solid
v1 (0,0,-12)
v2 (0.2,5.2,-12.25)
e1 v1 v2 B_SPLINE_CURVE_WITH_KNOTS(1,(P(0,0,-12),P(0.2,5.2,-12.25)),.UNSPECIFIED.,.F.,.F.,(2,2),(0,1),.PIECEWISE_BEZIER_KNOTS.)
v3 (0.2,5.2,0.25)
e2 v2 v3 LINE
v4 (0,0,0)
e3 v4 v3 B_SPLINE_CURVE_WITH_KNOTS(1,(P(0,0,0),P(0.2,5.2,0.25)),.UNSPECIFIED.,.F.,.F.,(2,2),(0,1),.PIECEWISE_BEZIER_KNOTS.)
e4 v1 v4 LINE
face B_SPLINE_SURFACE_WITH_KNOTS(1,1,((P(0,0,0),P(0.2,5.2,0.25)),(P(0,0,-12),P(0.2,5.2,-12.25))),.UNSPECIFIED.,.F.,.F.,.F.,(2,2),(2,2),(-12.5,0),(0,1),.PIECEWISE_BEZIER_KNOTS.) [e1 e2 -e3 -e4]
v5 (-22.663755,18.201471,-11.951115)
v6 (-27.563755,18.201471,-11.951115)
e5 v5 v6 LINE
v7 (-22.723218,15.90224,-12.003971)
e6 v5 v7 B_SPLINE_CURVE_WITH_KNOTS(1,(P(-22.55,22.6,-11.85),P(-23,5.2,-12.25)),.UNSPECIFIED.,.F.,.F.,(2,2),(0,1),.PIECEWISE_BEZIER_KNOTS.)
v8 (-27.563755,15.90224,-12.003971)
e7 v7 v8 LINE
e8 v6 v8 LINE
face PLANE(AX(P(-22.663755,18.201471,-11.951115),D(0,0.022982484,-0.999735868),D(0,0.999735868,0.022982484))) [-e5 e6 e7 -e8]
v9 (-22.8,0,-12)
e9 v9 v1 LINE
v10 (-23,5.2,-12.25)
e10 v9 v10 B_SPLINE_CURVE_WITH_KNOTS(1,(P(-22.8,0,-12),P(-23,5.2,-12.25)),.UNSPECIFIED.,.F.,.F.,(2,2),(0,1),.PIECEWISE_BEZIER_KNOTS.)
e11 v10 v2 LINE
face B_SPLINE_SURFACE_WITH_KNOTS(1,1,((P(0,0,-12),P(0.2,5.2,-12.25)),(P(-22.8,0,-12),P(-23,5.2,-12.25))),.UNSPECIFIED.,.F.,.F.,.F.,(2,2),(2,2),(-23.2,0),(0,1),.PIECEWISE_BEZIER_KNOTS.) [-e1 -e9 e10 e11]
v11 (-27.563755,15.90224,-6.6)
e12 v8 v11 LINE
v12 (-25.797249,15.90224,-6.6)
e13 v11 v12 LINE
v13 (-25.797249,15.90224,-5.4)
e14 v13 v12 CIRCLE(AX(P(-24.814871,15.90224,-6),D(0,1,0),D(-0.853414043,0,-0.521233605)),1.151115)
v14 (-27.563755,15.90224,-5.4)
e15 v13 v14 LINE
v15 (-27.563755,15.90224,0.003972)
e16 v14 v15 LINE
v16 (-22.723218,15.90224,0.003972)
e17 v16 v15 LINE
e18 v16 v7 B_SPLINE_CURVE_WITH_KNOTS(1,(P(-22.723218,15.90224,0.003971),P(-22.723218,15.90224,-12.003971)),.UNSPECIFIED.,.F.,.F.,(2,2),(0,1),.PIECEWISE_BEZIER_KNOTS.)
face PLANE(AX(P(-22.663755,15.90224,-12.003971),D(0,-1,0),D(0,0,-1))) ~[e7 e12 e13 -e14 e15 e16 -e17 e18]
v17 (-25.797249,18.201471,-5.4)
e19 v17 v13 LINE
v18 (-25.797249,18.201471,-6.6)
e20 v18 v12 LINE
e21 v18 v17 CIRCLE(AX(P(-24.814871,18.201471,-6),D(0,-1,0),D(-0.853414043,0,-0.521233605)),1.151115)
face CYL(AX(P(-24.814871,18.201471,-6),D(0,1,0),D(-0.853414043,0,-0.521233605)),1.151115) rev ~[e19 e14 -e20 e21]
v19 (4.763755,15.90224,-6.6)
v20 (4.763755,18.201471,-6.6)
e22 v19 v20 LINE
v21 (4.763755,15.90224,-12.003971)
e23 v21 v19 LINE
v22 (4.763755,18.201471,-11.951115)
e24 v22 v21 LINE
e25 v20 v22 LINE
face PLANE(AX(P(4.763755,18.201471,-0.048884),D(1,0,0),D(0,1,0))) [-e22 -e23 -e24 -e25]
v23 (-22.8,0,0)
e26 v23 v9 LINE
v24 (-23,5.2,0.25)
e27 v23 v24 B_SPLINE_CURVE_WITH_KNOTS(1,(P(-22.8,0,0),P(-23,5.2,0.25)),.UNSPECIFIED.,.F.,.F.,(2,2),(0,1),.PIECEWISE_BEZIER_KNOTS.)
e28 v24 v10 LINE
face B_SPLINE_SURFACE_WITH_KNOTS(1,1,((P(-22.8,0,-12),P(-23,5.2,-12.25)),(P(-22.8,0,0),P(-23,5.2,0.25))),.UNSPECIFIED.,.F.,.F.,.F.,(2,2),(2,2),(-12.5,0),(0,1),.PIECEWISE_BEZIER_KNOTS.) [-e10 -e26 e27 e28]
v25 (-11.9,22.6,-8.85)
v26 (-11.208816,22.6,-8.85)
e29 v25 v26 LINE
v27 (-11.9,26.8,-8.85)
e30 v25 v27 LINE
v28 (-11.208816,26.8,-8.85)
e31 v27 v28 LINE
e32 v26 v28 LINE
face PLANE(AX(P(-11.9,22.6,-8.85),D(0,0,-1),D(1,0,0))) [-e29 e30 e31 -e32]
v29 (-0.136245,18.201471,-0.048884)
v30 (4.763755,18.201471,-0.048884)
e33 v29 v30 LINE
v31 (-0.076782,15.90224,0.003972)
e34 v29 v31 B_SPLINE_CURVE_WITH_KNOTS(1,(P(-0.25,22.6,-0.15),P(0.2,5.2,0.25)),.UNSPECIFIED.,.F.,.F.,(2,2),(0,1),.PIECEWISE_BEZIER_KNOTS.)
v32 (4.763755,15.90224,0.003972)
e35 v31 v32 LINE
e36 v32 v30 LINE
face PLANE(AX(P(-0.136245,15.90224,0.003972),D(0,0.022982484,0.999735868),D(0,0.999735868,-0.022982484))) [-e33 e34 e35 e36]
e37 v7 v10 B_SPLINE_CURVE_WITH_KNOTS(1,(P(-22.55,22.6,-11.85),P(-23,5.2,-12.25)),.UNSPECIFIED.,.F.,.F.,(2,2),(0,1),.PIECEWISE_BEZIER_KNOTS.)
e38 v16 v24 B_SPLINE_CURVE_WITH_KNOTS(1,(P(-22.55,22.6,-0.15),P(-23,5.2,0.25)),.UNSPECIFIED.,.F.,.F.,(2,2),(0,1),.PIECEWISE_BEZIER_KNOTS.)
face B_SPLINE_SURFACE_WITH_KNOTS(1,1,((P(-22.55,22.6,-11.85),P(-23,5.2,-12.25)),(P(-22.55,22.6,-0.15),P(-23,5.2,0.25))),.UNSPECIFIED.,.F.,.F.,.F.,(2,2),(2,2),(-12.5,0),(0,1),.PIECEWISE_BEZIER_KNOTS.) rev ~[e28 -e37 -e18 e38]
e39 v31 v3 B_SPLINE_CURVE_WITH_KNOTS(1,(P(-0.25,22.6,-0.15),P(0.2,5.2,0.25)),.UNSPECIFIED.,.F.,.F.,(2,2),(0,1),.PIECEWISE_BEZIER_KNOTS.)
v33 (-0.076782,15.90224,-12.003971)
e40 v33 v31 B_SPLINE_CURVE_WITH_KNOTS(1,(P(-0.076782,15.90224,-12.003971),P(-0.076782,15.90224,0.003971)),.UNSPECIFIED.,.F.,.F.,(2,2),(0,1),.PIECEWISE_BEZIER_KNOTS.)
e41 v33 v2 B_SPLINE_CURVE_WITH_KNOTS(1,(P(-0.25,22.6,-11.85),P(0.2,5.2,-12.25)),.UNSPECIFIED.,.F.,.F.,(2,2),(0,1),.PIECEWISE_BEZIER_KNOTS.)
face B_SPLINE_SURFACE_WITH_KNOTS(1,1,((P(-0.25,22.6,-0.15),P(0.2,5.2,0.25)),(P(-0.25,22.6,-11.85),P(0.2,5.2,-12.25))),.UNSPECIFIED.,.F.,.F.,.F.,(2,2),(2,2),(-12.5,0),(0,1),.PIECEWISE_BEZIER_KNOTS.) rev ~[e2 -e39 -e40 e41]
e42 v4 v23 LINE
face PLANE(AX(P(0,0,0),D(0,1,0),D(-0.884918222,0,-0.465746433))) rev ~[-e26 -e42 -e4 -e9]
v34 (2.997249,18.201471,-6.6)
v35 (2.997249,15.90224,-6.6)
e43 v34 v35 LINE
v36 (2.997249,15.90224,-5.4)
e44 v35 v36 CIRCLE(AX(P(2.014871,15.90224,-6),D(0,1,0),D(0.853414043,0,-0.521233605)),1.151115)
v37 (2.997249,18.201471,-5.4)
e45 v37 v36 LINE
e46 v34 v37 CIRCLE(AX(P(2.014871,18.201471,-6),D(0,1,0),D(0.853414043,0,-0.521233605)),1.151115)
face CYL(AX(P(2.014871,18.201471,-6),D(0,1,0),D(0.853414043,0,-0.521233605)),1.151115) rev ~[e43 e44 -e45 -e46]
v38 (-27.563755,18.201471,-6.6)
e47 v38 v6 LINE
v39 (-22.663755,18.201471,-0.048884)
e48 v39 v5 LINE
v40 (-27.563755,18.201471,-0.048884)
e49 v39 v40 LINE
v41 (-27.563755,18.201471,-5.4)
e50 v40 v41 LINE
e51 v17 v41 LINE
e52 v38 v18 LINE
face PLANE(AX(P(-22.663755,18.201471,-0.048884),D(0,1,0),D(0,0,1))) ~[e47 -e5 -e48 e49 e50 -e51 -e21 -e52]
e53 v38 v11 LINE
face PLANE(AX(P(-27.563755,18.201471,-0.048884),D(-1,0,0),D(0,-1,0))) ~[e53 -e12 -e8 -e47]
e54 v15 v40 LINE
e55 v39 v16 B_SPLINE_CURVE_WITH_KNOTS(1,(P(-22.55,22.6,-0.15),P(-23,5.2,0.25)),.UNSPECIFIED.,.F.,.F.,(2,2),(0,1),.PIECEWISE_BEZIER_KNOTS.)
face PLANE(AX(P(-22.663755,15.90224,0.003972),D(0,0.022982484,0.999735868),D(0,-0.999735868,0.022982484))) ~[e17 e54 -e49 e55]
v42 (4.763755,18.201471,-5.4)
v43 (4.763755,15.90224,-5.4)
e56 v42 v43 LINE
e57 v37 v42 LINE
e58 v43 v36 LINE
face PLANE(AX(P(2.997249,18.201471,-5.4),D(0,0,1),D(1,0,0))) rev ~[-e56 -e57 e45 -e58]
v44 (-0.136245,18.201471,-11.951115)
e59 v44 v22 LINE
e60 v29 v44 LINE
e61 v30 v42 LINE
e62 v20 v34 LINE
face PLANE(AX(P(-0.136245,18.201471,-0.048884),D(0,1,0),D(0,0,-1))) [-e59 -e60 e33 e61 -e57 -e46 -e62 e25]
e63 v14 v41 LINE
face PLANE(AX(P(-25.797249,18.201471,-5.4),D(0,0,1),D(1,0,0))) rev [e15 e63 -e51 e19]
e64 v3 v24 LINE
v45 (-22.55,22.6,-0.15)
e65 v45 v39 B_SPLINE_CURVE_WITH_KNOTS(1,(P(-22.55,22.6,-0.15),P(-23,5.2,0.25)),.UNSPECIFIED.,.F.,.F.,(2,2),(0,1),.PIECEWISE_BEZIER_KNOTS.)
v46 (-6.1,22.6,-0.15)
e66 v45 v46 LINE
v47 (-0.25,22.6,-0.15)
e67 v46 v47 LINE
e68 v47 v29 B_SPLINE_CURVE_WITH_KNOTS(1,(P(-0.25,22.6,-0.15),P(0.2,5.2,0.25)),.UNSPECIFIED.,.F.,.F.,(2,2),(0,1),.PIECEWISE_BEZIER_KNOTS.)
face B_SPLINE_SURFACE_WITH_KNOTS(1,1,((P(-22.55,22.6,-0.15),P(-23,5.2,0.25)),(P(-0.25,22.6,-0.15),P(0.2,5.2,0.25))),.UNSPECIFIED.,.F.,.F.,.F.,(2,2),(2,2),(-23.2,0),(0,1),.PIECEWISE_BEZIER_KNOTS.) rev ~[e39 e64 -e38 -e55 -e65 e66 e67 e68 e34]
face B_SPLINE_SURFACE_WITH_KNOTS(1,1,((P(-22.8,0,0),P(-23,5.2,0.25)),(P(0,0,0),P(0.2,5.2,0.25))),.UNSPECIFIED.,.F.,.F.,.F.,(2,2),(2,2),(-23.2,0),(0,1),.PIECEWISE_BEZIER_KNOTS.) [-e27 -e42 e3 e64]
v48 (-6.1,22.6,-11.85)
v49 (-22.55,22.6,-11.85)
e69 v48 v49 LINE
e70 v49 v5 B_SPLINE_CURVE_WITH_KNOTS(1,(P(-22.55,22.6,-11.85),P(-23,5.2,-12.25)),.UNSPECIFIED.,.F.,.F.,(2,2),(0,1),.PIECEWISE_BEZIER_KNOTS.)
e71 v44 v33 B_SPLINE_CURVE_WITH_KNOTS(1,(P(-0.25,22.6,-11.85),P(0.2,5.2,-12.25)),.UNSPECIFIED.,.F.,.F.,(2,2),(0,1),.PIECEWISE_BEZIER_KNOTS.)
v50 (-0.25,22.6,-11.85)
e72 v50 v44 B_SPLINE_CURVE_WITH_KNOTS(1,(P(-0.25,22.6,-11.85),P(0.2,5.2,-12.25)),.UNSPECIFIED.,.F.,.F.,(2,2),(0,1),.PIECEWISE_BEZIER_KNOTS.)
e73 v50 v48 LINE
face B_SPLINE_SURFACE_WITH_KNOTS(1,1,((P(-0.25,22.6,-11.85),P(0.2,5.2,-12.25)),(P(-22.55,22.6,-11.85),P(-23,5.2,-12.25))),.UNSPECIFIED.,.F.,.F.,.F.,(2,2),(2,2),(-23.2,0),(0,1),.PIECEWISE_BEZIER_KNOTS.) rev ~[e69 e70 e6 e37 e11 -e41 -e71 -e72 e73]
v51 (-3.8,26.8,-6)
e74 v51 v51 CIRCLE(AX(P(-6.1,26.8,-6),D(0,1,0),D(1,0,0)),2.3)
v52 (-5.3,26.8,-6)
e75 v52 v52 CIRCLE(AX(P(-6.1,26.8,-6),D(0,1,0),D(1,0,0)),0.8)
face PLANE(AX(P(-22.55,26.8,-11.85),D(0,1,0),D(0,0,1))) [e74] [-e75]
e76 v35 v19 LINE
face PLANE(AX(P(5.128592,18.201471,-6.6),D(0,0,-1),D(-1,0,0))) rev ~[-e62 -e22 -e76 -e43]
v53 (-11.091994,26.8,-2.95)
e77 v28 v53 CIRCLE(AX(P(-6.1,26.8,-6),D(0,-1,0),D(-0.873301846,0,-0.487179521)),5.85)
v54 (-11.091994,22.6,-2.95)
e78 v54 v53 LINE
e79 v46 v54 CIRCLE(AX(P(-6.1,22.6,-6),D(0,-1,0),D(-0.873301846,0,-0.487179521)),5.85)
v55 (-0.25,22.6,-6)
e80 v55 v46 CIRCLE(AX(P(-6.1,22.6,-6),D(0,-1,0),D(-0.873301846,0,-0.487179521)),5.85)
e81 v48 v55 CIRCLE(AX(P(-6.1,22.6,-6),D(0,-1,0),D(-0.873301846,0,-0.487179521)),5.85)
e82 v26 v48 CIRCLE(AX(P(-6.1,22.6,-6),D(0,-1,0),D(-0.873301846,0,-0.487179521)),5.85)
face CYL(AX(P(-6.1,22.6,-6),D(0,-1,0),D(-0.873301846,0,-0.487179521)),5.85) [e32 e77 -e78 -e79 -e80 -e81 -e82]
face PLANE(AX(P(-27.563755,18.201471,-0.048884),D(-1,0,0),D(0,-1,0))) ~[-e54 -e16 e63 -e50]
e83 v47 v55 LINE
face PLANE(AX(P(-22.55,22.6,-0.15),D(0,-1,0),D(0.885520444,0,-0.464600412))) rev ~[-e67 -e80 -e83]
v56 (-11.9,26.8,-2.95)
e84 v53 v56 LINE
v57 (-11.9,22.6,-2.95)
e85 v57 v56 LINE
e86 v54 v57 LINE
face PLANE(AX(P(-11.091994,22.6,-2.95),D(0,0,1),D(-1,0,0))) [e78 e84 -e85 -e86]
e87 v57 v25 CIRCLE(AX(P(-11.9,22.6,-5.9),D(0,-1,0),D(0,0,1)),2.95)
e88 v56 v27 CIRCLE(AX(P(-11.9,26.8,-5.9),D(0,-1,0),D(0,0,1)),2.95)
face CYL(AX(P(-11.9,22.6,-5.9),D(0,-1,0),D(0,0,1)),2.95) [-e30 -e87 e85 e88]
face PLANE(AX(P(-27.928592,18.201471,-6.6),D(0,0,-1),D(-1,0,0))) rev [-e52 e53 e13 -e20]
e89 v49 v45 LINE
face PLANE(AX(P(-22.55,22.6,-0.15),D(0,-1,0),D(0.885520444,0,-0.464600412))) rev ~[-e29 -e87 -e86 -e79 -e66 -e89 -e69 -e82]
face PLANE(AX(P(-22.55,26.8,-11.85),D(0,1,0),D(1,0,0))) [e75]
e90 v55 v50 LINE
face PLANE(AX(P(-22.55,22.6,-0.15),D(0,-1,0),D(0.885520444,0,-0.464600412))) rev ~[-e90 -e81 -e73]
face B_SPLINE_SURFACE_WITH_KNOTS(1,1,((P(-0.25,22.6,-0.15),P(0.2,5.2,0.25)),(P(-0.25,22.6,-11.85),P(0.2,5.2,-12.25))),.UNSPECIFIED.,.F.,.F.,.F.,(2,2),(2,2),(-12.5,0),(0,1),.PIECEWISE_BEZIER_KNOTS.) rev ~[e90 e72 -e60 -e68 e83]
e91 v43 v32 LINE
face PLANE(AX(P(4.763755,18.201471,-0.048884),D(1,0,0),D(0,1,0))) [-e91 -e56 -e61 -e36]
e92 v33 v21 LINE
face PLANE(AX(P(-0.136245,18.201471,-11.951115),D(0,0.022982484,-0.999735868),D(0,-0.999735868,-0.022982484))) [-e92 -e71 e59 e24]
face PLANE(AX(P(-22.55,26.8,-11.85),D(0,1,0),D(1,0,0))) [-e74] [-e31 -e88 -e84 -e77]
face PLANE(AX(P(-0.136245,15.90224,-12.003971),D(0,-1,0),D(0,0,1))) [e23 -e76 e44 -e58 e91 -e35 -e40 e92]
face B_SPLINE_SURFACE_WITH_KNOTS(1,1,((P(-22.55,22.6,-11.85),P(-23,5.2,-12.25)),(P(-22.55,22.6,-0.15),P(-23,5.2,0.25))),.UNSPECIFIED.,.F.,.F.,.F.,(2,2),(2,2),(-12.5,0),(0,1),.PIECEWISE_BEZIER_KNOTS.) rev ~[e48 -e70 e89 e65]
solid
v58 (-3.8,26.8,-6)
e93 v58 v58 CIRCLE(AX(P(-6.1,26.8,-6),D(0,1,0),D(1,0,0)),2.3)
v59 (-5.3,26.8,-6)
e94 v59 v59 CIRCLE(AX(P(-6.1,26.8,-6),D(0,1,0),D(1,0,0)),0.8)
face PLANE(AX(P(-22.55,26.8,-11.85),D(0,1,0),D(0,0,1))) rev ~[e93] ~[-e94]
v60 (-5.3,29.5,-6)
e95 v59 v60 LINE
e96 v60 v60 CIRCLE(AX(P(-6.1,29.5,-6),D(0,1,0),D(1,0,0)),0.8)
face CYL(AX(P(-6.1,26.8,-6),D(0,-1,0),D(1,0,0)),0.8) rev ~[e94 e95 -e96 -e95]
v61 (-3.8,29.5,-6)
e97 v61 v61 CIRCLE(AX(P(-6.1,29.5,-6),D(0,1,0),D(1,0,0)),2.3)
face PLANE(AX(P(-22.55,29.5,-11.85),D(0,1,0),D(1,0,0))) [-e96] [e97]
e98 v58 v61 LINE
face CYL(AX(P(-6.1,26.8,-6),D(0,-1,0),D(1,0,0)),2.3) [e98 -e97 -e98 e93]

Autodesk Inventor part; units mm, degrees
sketch "Sketch1" plane through (0, 0, 0) normal (0, 1, 0) x (-1, 0, 0)
  line L0 (0, 0) -> (22.8, 0)
  line L1 (22.8, 0) -> (22.8, -12)
  line L2 (22.8, -12) -> (0, -12)
  line L3 (0, -12) -> (0, 0)
  dimension "d0" = 22.8
  dimension "d1" = 12
ref_plane "Work Plane3" through (0, 5.2, 0) normal (0, 1, 0) x (-1, 0, 0)
sketch "Sketch5" plane through (0, 5.2, 0) normal (0, 1, 0) x (-1, 0, 0)
  line L0 (11.4, -12.25) -> (23, -12.25)
  line L1 (23, -12.25) -> (-0.2, -12.25)
  line L2 (-0.2, -12.25) -> (-0.2, 0.25)
  line L3 (-0.2, 0.25) -> (23, 0.25)
  line L4 (23, 0.25) -> (23, -12.25)
  dimension "d32" = 23.2
  dimension "d33" = 12.5
sketch "Sketch1 outline for Loft1" plane through (0, 0, 0) normal (0, 1, 0) x (-1, 0, 0)
  line L0 (0, 0) -> (22.8, 0)
  line L1 (22.8, 0) -> (22.8, -12)
  line L2 (22.8, -12) -> (0, -12)
  line L3 (0, -12) -> (0, 0)
sketch "Sketch5 outline for Loft1" plane through (0, 5.2, 0) normal (0, 1, 0) x (-1, 0, 0)
  line L0 (23, -12.25) -> (-0.2, -12.25)
  line L1 (-0.2, -12.25) -> (-0.2, 0.25)
  line L2 (-0.2, 0.25) -> (23, 0.25)
  line L3 (23, 0.25) -> (23, -12.25)
loft "Loft1" add profiles "Sketch1 outline for Loft1", "Sketch5 outline for Loft1"
ref_plane "Work Plane4" through (0, 22.6, 0) normal (0, 1, 0) x (-1, 0, 0)
sketch "Sketch7" plane through (0, 22.6, 0) normal (0, 1, 0) x (-1, 0, 0)
  line L0 (0.25, -6) -> (0.25, -0.15)
  line L1 (0.25, -0.15) -> (0.25, -11.85)
  line L2 (0.25, -11.85) -> (22.55, -11.85)
  line L3 (0.25, -11.85) -> (22.55, -11.85)
  line L4 (22.55, -11.85) -> (22.55, -0.15)
  line L5 (22.55, -0.15) -> (0.25, -0.15)
  line L6 (0.25, -0.15) -> (0.25, -11.85)
  point P0 (0, 0)
sketch "Sketch7 outline for Loft2" plane through (0, 22.6, 0) normal (0, 1, 0) x (-1, 0, 0)
  line L0 (0.25, -0.15) -> (0.25, -11.85)
  line L1 (22.55, -0.15) -> (0.25, -0.15)
  line L2 (22.55, -11.85) -> (22.55, -0.15)
  line L3 (0.25, -11.85) -> (22.55, -11.85)
loft "Loft2" add profiles "Sketch7 outline for Loft2" section 2 edges at (-11.4, 5.2, 0.25) (0.2, 5.2, -6) (-11.4, 5.2, -12.25) (-23, 5.2, -6)
ref_plane "Work Plane5" through (-11.4, 0, 0) normal (1, 0, 0) x (0, 1, 0)
ref_plane "Work Plane7" through (-0.136245, 18.201471, -0.048884) normal (1, 0, 0) x (0, 1, 0)
ref_plane "Work Plane8" through (-0.136245, 18.201471, -0.048884) normal (-0.0258534, 0.9996657, 0) x (0.9996657, 0.0258534, 0)
sketch "Sketch10" plane through (-0.136245, 18.201471, -0.048884) normal (1, 0, 0) x (0, 1, 0)
  line L0 (0, 0) -> (0, -11.902231)
  line L1 (-2.299231, -11.955087) -> (-2.299231, 0.052856)
  line L2 (4.398529, -0.101116) -> (-13.001471, 0.298884)
  line L3 (4.398529, -11.801116) -> (-13.001471, -12.201116)
  point P0 (-18.201471, 0.048884)
sketch "Sketch10 outline for Extrusion6" plane through (-0.136245, 18.201471, -0.048884) normal (1, 0, 0) x (0, 1, 0)
  line L0 (0, 0) -> (0, -11.902231)
  line L1 (0, -11.902231) -> (-2.299231, -11.955087)
  line L2 (-2.299231, -11.955087) -> (-2.299231, 0.052856)
  line L3 (-2.299231, 0.052856) -> (0, 0)
extrude "Extrusion6" add sketch "Sketch10 outline for Extrusion6" along normal blind 4.9
sketch "Sketch9" plane through (-0.136245, 18.201471, -0.048884) normal (0, 1, 0) x (1, 0, 0)
  arc A0 (3.133494, 6.551116) -> (3.133494, 5.351116) centre (2.151116, 5.951116) ccw
  line L0 (0, 11.902231) -> (4.5, 11.902231)
  line L1 (0, 0) -> (4.5, 0)
  line L2 (0, 0) -> (0, 11.902231)
  line L3 (4.5, 11.902231) -> (4.5, 0)
  line L4 (4.5, 5.951116) -> (4.5, 6.551116)
  line L5 (4.5, 6.551116) -> (3.133494, 6.551116)
  line L6 (3.133494, 6.551116) -> (5.264837, 6.551116)
  line L7 (5.264837, 6.551116) -> (5.264837, 5.351116)
  line L8 (5.264837, 5.351116) -> (3.133494, 5.351116)
  point P0 (-0.334371, -0.048884)
  dimension "d58" = 4.8
  dimension "d59" = 4.8
  dimension "d60" = 1
  dimension "d62" = 1.2
sketch "Sketch9 outline for Extrusion5" plane through (-0.136245, 18.201471, -0.048884) normal (0, 1, 0) x (1, 0, 0)
  line L0 (5.264837, 6.551116) -> (3.133494, 6.551116)
  line L1 (5.264837, 5.351116) -> (5.264837, 6.551116)
  line L2 (3.133494, 5.351116) -> (5.264837, 5.351116)
  arc A0 (3.133494, 6.551116) -> (3.133494, 5.351116) centre (2.151116, 5.951116) ccw
extrude "Extrusion5" cut sketch "Sketch9 outline for Extrusion5" against normal blind 4.5
mirror "Mirror3" about plane through (-11.4, 0, 0) normal (1, 0, 0) of "Extrusion6", "Extrusion5"
sketch "Sketch11" plane through (-22.55, 22.6, -11.85) normal (0, 1, 0) x (1, 0, 0)
  arc A0 (11.458006, -8.9) -> (11.341184, -3) centre (16.45, -5.85) ccw
  line L0 (22.3, 0) -> (0, 0)
  line L1 (0, -11.7) -> (22.3, -11.7)
  line L2 (22.3, -11.7) -> (22.3, 0)
  arc A1 (10.65, -3) -> (10.65, -8.9) centre (10.65, -5.95) ccw
  line L3 (10.65, -3) -> (11.341184, -3)
  line L4 (10.65, -8.9) -> (11.458006, -8.9)
  point P0 (22.55, -11.85)
  dimension "d68" = 0
  dimension "d69" = 0
  dimension "d70" = 0
  dimension "d71" = 3
  dimension "d72" = 2.8
  dimension "d73" = 14.6
  dimension "d74" = 5.9
sketch "Sketch11 outline for Extrusion7" plane through (-22.55, 22.6, -11.85) normal (0, 1, 0) x (1, 0, 0)
  arc A0 (11.341184, -3) -> (11.458006, -8.9) centre (16.45, -5.85) cw
  line L0 (11.458006, -8.9) -> (10.65, -8.9)
  arc A1 (10.65, -8.9) -> (10.65, -3) centre (10.65, -5.95) cw
  line L1 (10.65, -3) -> (11.341184, -3)
extrude "Extrusion7" add sketch "Sketch11 outline for Extrusion7" along normal blind 4.2
sketch "Sketch12" plane through (-22.55, 26.8, -11.85) normal (0, 1, 0) x (1, 0, 0)
  arc A0 (11.458006, -8.9) -> (11.341184, -3) centre (16.45, -5.85) ccw
  circle A1 centre (16.45, -5.85) radius 2.3
  circle A2 centre (16.45, -5.85) radius 0.8
  point P0 (22.55, -11.85)
  dimension "d77" = 4.6
  dimension "d78" = 1.5
sketch "Sketch12 outline for Extrusion8" plane through (-22.55, 26.8, -11.85) normal (0, 1, 0) x (1, 0, 0)
  circle A0 centre (16.45, -5.85) radius 2.3
  circle A1 centre (16.45, -5.85) radius 0.8
extrude "Extrusion8" add sketch "Sketch12 outline for Extrusion8" along normal blind 2.7
ref_plane "Work Plane9" through (-22.55, 26.8, -11.85) normal (0, 1, 0) x (1, 0, 0)
split body "Split1" result two bodies by plane through (-22.55, 26.8, -11.85) normal (0, 1, 0) first body at (-4.305837, 28.6, -5.85516)
properties part number "servo" material "ABS Plastic"
